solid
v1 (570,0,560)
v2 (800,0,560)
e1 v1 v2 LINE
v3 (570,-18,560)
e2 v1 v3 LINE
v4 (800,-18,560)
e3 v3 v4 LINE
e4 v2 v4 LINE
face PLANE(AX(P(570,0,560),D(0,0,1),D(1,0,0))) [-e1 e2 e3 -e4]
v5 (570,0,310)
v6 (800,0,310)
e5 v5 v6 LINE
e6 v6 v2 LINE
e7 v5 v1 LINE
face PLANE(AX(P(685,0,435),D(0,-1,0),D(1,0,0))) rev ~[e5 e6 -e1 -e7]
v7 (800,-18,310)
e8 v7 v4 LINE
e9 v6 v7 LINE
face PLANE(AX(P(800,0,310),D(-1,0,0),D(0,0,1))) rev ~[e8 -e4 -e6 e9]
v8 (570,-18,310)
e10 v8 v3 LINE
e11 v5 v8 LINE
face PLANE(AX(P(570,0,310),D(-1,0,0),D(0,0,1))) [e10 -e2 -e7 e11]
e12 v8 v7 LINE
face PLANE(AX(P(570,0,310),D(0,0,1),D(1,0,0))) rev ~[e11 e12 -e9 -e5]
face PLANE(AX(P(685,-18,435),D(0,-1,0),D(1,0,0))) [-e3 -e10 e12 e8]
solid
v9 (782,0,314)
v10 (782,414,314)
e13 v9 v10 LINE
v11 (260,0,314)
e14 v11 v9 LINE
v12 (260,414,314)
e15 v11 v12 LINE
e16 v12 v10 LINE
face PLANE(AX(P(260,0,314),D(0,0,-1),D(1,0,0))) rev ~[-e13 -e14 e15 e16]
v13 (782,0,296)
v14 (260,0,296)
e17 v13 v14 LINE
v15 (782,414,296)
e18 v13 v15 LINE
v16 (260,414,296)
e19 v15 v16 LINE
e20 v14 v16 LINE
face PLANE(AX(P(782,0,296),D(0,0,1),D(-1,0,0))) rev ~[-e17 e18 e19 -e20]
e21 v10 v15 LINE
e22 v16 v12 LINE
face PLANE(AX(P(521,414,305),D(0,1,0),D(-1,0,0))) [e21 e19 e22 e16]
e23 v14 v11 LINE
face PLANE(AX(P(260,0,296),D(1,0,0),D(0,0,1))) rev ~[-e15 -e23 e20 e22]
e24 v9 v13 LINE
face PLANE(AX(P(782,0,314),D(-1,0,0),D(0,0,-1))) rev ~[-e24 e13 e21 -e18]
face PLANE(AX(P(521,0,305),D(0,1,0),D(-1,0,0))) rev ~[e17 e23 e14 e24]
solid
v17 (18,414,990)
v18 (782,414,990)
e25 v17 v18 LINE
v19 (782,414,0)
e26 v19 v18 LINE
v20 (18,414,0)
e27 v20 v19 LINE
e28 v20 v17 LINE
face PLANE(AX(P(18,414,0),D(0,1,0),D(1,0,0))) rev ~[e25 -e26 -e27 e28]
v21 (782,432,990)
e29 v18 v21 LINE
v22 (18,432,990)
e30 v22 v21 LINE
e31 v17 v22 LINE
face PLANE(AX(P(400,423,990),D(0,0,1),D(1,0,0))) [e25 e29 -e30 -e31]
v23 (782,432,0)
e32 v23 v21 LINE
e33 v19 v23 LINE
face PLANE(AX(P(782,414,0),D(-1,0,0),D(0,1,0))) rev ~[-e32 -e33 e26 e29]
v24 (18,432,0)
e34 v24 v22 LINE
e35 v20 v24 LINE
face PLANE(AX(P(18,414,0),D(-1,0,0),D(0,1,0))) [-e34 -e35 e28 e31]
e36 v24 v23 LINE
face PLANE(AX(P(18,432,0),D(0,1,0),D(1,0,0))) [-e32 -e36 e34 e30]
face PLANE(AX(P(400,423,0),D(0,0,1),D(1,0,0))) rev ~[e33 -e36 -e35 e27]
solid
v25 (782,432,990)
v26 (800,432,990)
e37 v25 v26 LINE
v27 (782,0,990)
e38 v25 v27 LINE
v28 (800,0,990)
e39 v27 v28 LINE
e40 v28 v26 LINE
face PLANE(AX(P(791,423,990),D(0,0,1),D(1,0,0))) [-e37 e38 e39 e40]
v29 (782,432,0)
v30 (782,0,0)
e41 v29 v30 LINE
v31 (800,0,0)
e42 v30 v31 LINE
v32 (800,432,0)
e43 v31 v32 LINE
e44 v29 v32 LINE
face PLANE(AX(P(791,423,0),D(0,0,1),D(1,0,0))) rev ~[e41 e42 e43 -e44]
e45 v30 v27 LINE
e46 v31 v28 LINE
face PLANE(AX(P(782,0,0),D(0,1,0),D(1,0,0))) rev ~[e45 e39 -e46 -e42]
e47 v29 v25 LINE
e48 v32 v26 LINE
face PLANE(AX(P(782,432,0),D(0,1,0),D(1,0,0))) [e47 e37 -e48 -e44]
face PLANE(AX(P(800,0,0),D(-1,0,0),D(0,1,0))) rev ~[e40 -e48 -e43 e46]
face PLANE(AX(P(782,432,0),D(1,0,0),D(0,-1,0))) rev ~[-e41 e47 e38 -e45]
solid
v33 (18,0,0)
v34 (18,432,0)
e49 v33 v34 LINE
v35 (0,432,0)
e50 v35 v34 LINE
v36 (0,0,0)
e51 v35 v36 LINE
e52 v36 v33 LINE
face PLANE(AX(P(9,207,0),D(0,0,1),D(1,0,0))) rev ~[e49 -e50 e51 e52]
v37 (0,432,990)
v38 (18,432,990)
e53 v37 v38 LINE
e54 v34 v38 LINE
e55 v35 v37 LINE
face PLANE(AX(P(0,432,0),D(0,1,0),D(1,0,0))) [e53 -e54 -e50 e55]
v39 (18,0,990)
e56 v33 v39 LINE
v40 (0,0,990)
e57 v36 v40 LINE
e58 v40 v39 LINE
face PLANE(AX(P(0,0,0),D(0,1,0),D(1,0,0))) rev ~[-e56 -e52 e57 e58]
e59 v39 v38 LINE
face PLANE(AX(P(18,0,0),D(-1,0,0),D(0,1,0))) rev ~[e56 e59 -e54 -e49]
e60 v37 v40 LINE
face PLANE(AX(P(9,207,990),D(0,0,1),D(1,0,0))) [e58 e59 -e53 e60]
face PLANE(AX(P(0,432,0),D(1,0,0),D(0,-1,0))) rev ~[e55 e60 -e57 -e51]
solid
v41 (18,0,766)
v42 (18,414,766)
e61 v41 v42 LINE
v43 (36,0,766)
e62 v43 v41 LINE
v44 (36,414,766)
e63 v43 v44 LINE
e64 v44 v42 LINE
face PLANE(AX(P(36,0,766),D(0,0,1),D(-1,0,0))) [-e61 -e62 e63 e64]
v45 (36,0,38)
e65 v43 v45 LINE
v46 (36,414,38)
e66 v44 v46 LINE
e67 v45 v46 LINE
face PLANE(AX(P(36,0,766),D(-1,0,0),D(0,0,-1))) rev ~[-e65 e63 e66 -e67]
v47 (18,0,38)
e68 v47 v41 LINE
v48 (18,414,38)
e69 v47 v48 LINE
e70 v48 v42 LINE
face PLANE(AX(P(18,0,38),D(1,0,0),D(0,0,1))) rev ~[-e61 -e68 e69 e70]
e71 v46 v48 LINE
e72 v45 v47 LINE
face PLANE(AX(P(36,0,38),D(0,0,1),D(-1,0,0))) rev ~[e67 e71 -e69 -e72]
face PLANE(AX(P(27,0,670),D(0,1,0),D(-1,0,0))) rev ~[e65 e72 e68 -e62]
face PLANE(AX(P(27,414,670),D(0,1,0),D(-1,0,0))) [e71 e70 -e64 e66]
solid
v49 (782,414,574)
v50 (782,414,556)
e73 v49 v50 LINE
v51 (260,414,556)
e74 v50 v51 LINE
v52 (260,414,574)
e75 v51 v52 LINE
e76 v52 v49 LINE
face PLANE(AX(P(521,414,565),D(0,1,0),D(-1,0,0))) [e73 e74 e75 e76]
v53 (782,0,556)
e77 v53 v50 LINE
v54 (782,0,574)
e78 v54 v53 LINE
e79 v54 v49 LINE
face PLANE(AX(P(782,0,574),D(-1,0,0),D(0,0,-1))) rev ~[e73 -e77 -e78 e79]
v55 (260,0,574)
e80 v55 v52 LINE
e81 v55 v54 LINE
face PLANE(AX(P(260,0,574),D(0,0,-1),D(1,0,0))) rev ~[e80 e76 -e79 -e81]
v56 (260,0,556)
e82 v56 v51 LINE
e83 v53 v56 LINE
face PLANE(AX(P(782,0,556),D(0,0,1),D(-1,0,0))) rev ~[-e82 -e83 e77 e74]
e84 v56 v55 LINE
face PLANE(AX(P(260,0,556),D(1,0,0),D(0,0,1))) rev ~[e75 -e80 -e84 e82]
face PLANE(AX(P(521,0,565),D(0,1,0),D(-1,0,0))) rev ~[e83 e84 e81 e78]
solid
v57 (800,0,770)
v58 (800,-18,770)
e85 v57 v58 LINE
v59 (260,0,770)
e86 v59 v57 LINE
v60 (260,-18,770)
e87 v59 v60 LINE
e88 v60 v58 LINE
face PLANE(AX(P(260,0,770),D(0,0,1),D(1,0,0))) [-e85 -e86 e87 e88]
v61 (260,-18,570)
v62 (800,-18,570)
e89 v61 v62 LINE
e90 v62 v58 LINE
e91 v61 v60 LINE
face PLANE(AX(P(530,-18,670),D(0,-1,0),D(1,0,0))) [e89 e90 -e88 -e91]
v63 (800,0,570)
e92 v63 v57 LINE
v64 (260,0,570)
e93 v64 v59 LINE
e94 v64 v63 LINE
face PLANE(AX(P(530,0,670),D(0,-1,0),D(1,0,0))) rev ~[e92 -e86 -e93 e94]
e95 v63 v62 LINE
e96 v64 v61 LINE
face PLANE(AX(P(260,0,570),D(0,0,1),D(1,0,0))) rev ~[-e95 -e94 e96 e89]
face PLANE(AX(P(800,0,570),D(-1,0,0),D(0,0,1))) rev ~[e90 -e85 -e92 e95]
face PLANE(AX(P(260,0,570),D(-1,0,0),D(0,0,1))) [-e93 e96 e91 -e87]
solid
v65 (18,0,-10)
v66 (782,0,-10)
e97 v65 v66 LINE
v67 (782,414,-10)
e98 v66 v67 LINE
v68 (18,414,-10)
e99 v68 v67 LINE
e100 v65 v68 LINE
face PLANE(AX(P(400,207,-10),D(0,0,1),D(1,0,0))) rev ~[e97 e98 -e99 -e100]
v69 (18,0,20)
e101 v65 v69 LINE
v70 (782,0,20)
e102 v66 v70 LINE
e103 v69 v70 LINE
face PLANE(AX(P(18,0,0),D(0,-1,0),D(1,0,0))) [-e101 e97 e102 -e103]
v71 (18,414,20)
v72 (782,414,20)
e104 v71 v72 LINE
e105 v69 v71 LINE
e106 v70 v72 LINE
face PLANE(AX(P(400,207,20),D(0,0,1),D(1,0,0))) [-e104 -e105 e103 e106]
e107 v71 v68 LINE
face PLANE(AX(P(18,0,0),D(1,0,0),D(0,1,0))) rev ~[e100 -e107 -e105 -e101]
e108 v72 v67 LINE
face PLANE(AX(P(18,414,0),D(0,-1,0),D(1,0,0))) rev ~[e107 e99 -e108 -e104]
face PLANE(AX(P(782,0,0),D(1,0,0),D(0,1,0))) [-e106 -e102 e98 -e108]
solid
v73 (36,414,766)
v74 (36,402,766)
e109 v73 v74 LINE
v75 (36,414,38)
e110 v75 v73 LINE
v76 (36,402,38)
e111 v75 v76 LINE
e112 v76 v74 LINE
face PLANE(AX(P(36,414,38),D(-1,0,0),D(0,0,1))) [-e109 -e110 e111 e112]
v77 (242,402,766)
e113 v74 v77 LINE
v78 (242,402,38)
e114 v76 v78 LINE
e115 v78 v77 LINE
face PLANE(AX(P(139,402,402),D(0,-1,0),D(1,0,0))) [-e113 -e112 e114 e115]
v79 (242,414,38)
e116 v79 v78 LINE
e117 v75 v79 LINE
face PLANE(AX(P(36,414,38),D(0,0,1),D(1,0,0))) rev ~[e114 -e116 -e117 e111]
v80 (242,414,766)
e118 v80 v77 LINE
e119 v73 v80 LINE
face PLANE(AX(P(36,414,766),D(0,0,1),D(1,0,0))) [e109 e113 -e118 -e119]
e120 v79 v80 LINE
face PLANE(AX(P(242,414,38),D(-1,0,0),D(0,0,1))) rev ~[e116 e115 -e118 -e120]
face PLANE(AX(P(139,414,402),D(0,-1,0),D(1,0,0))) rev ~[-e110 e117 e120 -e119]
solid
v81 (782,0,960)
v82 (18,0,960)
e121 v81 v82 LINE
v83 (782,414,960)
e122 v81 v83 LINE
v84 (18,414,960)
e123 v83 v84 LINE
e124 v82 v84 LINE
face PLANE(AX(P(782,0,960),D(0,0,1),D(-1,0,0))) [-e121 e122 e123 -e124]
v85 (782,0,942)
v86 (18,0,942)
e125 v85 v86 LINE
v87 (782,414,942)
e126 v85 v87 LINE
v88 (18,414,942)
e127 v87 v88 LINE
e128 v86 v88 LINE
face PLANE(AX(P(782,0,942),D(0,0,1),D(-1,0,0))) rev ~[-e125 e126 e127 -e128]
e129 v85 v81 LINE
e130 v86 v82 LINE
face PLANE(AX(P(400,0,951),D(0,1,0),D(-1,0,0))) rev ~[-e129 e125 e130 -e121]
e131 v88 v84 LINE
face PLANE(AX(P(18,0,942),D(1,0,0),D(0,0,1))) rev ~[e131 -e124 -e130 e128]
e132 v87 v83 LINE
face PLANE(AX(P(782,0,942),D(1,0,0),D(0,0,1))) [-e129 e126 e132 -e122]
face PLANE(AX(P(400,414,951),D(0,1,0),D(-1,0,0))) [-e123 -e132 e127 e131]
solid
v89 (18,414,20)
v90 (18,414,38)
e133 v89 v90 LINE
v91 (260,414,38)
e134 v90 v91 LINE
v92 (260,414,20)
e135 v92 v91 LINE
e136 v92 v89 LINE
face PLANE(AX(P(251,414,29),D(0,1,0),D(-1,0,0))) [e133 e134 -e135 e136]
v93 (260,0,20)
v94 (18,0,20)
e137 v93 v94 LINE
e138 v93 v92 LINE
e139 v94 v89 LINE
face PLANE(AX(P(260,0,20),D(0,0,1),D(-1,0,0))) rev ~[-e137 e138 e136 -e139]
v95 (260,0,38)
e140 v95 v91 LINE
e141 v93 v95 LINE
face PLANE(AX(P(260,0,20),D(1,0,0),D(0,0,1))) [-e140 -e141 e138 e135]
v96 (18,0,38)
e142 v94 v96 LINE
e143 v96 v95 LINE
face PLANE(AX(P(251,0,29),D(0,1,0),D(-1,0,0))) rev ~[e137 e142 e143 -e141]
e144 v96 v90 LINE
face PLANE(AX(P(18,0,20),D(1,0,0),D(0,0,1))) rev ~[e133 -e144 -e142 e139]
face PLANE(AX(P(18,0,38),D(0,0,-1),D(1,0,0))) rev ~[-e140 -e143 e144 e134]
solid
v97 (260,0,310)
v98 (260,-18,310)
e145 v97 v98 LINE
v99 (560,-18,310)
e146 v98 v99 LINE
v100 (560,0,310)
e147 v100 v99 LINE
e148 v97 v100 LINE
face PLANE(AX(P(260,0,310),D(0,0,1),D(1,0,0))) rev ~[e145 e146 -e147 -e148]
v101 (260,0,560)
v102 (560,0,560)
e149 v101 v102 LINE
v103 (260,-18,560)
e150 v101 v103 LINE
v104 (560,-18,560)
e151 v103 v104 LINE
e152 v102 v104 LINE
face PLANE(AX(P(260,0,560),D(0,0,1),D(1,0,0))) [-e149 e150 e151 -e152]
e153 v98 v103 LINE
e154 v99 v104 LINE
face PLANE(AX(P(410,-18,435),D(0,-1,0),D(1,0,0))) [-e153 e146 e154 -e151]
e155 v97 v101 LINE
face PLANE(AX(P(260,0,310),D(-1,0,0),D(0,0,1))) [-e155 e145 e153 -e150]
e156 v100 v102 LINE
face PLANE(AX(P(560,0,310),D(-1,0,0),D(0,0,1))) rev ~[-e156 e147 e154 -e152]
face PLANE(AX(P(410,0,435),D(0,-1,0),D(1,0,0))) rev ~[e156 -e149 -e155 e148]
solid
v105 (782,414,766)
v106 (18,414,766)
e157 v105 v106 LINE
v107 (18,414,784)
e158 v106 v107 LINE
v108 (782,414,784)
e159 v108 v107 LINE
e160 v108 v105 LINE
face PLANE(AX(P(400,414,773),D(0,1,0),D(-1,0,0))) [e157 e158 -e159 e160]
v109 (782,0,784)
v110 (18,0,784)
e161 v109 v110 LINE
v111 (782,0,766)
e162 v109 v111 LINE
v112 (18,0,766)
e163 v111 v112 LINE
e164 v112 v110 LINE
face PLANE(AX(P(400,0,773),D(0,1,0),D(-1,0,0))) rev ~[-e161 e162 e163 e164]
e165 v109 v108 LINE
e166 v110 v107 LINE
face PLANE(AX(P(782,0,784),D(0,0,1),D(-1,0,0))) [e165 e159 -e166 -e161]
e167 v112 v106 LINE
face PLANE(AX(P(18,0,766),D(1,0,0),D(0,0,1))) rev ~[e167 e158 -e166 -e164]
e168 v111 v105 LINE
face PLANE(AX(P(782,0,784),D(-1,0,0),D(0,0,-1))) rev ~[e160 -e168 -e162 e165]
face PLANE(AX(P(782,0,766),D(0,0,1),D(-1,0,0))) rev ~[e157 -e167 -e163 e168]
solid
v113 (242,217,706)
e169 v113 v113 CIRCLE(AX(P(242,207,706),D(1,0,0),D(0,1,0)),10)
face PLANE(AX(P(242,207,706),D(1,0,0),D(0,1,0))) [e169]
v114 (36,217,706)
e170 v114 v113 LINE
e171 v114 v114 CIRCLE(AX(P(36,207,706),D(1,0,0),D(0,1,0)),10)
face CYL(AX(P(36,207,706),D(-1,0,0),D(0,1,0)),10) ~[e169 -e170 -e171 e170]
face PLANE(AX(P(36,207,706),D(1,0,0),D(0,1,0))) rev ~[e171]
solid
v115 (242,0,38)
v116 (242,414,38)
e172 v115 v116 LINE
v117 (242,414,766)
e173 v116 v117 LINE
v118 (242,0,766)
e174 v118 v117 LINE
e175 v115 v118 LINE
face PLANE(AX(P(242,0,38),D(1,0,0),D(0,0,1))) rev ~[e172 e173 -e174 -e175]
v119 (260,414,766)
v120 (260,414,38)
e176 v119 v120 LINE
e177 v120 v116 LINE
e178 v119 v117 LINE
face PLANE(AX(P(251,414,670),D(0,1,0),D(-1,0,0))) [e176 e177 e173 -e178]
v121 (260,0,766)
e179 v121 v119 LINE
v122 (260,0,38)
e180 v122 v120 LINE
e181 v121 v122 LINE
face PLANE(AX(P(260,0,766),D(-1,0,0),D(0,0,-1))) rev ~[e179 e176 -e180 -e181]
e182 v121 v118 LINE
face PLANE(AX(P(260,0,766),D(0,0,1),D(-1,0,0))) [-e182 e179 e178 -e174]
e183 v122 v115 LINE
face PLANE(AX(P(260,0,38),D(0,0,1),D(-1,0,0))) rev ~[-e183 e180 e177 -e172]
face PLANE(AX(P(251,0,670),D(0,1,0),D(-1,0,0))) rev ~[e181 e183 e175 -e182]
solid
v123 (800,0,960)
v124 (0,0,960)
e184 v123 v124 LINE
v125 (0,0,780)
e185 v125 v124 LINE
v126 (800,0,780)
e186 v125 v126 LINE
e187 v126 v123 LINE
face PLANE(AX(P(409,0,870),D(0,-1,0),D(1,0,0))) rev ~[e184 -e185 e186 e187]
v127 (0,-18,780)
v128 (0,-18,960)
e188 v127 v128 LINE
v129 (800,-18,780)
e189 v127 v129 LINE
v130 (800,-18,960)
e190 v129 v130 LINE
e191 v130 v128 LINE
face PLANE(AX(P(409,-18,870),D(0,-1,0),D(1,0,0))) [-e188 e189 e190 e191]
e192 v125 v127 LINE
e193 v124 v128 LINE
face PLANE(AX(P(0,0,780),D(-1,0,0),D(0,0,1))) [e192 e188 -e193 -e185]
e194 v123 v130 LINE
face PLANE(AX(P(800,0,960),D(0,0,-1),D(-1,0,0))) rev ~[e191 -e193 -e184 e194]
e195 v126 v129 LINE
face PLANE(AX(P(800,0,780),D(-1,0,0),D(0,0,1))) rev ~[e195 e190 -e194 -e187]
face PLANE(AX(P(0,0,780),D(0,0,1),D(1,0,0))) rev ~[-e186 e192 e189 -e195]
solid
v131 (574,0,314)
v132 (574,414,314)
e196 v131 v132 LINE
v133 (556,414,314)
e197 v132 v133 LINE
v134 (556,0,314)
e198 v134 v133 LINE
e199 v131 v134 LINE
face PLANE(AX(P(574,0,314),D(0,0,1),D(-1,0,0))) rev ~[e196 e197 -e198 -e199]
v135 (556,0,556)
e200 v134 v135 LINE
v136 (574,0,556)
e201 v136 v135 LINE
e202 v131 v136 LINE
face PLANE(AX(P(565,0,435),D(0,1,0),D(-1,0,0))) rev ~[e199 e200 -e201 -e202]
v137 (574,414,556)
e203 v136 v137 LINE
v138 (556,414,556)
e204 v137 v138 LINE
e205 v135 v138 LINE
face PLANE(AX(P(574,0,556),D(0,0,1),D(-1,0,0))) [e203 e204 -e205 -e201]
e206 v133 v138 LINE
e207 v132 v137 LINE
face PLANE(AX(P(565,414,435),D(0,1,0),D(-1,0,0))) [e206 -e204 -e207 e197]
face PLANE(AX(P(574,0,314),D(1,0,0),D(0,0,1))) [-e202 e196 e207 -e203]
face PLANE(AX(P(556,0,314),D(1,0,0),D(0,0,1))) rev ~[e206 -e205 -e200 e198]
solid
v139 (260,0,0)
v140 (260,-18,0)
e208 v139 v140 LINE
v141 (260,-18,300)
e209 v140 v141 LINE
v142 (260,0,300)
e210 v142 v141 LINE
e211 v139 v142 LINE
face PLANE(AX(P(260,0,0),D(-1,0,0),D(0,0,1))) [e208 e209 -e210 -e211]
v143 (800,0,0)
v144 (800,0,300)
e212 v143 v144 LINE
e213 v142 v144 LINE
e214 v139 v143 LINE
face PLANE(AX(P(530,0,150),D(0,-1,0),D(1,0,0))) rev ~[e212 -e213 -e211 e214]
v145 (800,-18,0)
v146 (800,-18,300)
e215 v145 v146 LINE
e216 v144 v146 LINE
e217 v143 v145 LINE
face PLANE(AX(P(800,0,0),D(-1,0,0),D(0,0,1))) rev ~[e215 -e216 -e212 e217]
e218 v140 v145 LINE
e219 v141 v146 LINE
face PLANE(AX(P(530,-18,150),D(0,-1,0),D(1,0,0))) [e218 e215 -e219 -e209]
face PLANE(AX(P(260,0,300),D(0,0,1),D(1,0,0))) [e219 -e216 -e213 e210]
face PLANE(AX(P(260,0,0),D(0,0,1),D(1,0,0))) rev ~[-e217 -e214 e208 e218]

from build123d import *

# Parameters (mm, degrees)
F0_W          = 18
F0_H          = 414
F0_H_2        = 18
F1_DEPTH      = 990
F0_W_2        = 764
F2_DEPTH      = 990
F3_DEPTH      = 20
F3_DEPTH_BACK = 10
F4_W          = 782
F4_H          = 180
F4_W_2        = 18
F5_DEPTH      = 18
F4_W_3        = 540
F4_H_2        = 200
F4_W_4        = 230
F4_H_3        = 250
F4_H_4        = 300
F4_W_5        = 300
F6_W          = 764
F6_H          = 18
F7_DEPTH      = 414
F6_H_2        = 4
F6_W_2        = 18
F6_W_3        = 206
F6_H_3        = 192
F6_H_4        = 258
F6_H_5        = 242
F8_DEPTH      = 414
F9_R          = 10
F10_DEPTH     = 206
F11_W         = 206
F11_H         = 728
F12_DEPTH     = 12


# Not quite as in the source:
# - a feature names something its author has since deleted; it is built from what else it names


with BuildPart() as f1:
    # F0 (on Top) → F1 (new body)
    with BuildSketch(Plane.XY):
        with Locations((9, 207)):
            Rectangle(F0_W, F0_H)
        with Locations((9, 423)):
            Rectangle(F0_W, F0_H_2)
    extrude(amount=F1_DEPTH)


with BuildPart() as f1b:
    # F0 (on Top) → F1, piece 2 (new body)
    with BuildSketch(Plane.XY):
        with Locations((791, 423)):
            Rectangle(F0_W, F0_H_2)
        with Locations((791, 207)):
            Rectangle(F0_W, F0_H)
    extrude(amount=F1_DEPTH)


with BuildPart() as f2:
    # F0 (on Top) → F2 (new body, through all)
    with BuildSketch(Plane.XY):
        with Locations((400, 423)):
            Rectangle(F0_W_2, F0_H_2)
    extrude(amount=F2_DEPTH)


with BuildPart() as f3:
    # F0 (on Top) → F3 (new body, two sides)
    with BuildSketch(Plane.XY) as f3_sk:
        with Locations((400, 207)):
            Rectangle(F0_W_2, F0_H)
    extrude(amount=F3_DEPTH)
    extrude(f3_sk.sketch, amount=-F3_DEPTH_BACK)


with BuildPart() as f5:
    # F4 (on face) → F5 (new body)
    with BuildSketch(Plane.XZ):
        with Locations((409, 870)):
            Rectangle(F4_W, F4_H)
        with Locations((9, 870)):
            Rectangle(F4_W_2, F4_H)
    extrude(amount=F5_DEPTH)


with BuildPart() as f5b:
    # F4 (on face) → F5, piece 2 (new body)
    with BuildSketch(Plane.XZ):
        with Locations((530, 670)):
            Rectangle(F4_W_3, F4_H_2)
    extrude(amount=F5_DEPTH)


with BuildPart() as f5c:
    # F4 (on face) → F5, piece 3 (new body)
    with BuildSketch(Plane.XZ):
        with Locations((685, 435)):
            Rectangle(F4_W_4, F4_H_3)
    extrude(amount=F5_DEPTH)


with BuildPart() as f5d:
    # F4 (on face) → F5, piece 4 (new body)
    with BuildSketch(Plane.XZ):
        with Locations((530, 150)):
            Rectangle(F4_W_3, F4_H_4)
    extrude(amount=F5_DEPTH)


with BuildPart() as f5e:
    # F4 (on face) → F5, piece 5 (new body)
    with BuildSketch(Plane.XZ):
        with Locations((410, 435)):
            Rectangle(F4_W_5, F4_H_3)
    extrude(amount=F5_DEPTH)


with BuildPart() as f7:
    # F6 (on face) → F7 (new body, through all)
    with BuildSketch(Plane(origin=(0, 0, 0), x_dir=(-1, 0, 0), z_dir=(0, 1, 0))):
        with Locations((-400, 951)):
            Rectangle(F6_W, F6_H)
    extrude(amount=F7_DEPTH)


with BuildPart() as f7b:
    # F6 (on face) → F7, piece 2 (new body, through all)
    with BuildSketch(Plane(origin=(0, 0, 0), x_dir=(-1, 0, 0), z_dir=(0, 1, 0))):
        Polygon((-18, 780), (-782, 780), (-782, 766), (-260, 766), (-242, 766), (-36, 766), (-18, 766), align=None)
        with Locations((-400, 782)):
            Rectangle(F6_W, F6_H_2)
    extrude(amount=F7_DEPTH)


with BuildPart() as f7c:
    # F6 (on face) → F7, piece 3 (new body, through all)
    with BuildSketch(Plane(origin=(0, 0, 0), x_dir=(-1, 0, 0), z_dir=(0, 1, 0))):
        Polygon((-260, 556), (-260, 574), (-782, 574), (-782, 556), (-574, 556), (-556, 556), align=None)
    extrude(amount=F7_DEPTH)


with BuildPart() as f7d:
    # F6 (on face) → F7, piece 4 (new body, through all)
    with BuildSketch(Plane(origin=(0, 0, 0), x_dir=(-1, 0, 0), z_dir=(0, 1, 0))):
        Polygon((-260, 296), (-260, 314), (-556, 314), (-574, 314), (-782, 314), (-782, 296), align=None)
    extrude(amount=F7_DEPTH)


with BuildPart() as f7e:
    # F6 (on face) → F7, piece 5 (new body, through all)
    with BuildSketch(Plane(origin=(0, 0, 0), x_dir=(-1, 0, 0), z_dir=(0, 1, 0))):
        with Locations((-251, 29)):
            Rectangle(F6_W_2, F6_H)
        with Locations((-139, 29)):
            Rectangle(F6_W_3, F6_H)
        with Locations((-27, 29)):
            Rectangle(F6_W_2, F6_H)
    extrude(amount=F7_DEPTH)


with BuildPart() as f8:
    # F6 (on face) → F8 (new body, through all)
    with BuildSketch(Plane(origin=(0, 0, 0), x_dir=(-1, 0, 0), z_dir=(0, 1, 0))):
        with Locations((-251, 670)):
            Rectangle(F6_W_2, F6_H_3)
        with Locations((-251, 167)):
            Rectangle(F6_W_2, F6_H_4)
        with Locations((-251, 305)):
            Rectangle(F6_W_2, F6_H)
        with Locations((-251, 435)):
            Rectangle(F6_W_2, F6_H_5)
        with Locations((-251, 565)):
            Rectangle(F6_W_2, F6_H)
    extrude(amount=F8_DEPTH)


with BuildPart() as f8b:
    # F6 (on face) → F8, piece 2 (new body, through all)
    with BuildSketch(Plane(origin=(0, 0, 0), x_dir=(-1, 0, 0), z_dir=(0, 1, 0))):
        with Locations((-565, 435)):
            Rectangle(F6_W_2, F6_H_5)
    extrude(amount=F8_DEPTH)


with BuildPart() as f8c:
    # F6 (on face) → F8, piece 3 (new body, through all)
    with BuildSketch(Plane(origin=(0, 0, 0), x_dir=(-1, 0, 0), z_dir=(0, 1, 0))):
        with Locations((-27, 670)):
            Rectangle(F6_W_2, F6_H_3)
        with Locations((-27, 565)):
            Rectangle(F6_W_2, F6_H)
        with Locations((-27, 435)):
            Rectangle(F6_W_2, F6_H_5)
        with Locations((-27, 305)):
            Rectangle(F6_W_2, F6_H)
        with Locations((-27, 167)):
            Rectangle(F6_W_2, F6_H_4)
    extrude(amount=F8_DEPTH)


with BuildPart() as f10:
    # F9 (on face) → F10 (new body, through all)
    with BuildSketch(Plane.YZ.offset(36)):
        with Locations((207, 706)):
            Circle(F9_R)
    extrude(amount=F10_DEPTH)


with BuildPart() as f12:
    # F11 (on face) → F12 (new body)
    with BuildSketch(Plane.XZ.offset(-414)):
        with Locations((139, 402)):
            Rectangle(F11_W, F11_H)
    extrude(amount=F12_DEPTH)


solid = Compound([f1.part, f1b.part, f2.part, f3.part, f5.part, f5b.part, f5c.part, f5d.part, f5e.part, f7.part, f7b.part, f7c.part, f7d.part, f7e.part, f8.part, f8b.part, f8c.part, f10.part, f12.part])
